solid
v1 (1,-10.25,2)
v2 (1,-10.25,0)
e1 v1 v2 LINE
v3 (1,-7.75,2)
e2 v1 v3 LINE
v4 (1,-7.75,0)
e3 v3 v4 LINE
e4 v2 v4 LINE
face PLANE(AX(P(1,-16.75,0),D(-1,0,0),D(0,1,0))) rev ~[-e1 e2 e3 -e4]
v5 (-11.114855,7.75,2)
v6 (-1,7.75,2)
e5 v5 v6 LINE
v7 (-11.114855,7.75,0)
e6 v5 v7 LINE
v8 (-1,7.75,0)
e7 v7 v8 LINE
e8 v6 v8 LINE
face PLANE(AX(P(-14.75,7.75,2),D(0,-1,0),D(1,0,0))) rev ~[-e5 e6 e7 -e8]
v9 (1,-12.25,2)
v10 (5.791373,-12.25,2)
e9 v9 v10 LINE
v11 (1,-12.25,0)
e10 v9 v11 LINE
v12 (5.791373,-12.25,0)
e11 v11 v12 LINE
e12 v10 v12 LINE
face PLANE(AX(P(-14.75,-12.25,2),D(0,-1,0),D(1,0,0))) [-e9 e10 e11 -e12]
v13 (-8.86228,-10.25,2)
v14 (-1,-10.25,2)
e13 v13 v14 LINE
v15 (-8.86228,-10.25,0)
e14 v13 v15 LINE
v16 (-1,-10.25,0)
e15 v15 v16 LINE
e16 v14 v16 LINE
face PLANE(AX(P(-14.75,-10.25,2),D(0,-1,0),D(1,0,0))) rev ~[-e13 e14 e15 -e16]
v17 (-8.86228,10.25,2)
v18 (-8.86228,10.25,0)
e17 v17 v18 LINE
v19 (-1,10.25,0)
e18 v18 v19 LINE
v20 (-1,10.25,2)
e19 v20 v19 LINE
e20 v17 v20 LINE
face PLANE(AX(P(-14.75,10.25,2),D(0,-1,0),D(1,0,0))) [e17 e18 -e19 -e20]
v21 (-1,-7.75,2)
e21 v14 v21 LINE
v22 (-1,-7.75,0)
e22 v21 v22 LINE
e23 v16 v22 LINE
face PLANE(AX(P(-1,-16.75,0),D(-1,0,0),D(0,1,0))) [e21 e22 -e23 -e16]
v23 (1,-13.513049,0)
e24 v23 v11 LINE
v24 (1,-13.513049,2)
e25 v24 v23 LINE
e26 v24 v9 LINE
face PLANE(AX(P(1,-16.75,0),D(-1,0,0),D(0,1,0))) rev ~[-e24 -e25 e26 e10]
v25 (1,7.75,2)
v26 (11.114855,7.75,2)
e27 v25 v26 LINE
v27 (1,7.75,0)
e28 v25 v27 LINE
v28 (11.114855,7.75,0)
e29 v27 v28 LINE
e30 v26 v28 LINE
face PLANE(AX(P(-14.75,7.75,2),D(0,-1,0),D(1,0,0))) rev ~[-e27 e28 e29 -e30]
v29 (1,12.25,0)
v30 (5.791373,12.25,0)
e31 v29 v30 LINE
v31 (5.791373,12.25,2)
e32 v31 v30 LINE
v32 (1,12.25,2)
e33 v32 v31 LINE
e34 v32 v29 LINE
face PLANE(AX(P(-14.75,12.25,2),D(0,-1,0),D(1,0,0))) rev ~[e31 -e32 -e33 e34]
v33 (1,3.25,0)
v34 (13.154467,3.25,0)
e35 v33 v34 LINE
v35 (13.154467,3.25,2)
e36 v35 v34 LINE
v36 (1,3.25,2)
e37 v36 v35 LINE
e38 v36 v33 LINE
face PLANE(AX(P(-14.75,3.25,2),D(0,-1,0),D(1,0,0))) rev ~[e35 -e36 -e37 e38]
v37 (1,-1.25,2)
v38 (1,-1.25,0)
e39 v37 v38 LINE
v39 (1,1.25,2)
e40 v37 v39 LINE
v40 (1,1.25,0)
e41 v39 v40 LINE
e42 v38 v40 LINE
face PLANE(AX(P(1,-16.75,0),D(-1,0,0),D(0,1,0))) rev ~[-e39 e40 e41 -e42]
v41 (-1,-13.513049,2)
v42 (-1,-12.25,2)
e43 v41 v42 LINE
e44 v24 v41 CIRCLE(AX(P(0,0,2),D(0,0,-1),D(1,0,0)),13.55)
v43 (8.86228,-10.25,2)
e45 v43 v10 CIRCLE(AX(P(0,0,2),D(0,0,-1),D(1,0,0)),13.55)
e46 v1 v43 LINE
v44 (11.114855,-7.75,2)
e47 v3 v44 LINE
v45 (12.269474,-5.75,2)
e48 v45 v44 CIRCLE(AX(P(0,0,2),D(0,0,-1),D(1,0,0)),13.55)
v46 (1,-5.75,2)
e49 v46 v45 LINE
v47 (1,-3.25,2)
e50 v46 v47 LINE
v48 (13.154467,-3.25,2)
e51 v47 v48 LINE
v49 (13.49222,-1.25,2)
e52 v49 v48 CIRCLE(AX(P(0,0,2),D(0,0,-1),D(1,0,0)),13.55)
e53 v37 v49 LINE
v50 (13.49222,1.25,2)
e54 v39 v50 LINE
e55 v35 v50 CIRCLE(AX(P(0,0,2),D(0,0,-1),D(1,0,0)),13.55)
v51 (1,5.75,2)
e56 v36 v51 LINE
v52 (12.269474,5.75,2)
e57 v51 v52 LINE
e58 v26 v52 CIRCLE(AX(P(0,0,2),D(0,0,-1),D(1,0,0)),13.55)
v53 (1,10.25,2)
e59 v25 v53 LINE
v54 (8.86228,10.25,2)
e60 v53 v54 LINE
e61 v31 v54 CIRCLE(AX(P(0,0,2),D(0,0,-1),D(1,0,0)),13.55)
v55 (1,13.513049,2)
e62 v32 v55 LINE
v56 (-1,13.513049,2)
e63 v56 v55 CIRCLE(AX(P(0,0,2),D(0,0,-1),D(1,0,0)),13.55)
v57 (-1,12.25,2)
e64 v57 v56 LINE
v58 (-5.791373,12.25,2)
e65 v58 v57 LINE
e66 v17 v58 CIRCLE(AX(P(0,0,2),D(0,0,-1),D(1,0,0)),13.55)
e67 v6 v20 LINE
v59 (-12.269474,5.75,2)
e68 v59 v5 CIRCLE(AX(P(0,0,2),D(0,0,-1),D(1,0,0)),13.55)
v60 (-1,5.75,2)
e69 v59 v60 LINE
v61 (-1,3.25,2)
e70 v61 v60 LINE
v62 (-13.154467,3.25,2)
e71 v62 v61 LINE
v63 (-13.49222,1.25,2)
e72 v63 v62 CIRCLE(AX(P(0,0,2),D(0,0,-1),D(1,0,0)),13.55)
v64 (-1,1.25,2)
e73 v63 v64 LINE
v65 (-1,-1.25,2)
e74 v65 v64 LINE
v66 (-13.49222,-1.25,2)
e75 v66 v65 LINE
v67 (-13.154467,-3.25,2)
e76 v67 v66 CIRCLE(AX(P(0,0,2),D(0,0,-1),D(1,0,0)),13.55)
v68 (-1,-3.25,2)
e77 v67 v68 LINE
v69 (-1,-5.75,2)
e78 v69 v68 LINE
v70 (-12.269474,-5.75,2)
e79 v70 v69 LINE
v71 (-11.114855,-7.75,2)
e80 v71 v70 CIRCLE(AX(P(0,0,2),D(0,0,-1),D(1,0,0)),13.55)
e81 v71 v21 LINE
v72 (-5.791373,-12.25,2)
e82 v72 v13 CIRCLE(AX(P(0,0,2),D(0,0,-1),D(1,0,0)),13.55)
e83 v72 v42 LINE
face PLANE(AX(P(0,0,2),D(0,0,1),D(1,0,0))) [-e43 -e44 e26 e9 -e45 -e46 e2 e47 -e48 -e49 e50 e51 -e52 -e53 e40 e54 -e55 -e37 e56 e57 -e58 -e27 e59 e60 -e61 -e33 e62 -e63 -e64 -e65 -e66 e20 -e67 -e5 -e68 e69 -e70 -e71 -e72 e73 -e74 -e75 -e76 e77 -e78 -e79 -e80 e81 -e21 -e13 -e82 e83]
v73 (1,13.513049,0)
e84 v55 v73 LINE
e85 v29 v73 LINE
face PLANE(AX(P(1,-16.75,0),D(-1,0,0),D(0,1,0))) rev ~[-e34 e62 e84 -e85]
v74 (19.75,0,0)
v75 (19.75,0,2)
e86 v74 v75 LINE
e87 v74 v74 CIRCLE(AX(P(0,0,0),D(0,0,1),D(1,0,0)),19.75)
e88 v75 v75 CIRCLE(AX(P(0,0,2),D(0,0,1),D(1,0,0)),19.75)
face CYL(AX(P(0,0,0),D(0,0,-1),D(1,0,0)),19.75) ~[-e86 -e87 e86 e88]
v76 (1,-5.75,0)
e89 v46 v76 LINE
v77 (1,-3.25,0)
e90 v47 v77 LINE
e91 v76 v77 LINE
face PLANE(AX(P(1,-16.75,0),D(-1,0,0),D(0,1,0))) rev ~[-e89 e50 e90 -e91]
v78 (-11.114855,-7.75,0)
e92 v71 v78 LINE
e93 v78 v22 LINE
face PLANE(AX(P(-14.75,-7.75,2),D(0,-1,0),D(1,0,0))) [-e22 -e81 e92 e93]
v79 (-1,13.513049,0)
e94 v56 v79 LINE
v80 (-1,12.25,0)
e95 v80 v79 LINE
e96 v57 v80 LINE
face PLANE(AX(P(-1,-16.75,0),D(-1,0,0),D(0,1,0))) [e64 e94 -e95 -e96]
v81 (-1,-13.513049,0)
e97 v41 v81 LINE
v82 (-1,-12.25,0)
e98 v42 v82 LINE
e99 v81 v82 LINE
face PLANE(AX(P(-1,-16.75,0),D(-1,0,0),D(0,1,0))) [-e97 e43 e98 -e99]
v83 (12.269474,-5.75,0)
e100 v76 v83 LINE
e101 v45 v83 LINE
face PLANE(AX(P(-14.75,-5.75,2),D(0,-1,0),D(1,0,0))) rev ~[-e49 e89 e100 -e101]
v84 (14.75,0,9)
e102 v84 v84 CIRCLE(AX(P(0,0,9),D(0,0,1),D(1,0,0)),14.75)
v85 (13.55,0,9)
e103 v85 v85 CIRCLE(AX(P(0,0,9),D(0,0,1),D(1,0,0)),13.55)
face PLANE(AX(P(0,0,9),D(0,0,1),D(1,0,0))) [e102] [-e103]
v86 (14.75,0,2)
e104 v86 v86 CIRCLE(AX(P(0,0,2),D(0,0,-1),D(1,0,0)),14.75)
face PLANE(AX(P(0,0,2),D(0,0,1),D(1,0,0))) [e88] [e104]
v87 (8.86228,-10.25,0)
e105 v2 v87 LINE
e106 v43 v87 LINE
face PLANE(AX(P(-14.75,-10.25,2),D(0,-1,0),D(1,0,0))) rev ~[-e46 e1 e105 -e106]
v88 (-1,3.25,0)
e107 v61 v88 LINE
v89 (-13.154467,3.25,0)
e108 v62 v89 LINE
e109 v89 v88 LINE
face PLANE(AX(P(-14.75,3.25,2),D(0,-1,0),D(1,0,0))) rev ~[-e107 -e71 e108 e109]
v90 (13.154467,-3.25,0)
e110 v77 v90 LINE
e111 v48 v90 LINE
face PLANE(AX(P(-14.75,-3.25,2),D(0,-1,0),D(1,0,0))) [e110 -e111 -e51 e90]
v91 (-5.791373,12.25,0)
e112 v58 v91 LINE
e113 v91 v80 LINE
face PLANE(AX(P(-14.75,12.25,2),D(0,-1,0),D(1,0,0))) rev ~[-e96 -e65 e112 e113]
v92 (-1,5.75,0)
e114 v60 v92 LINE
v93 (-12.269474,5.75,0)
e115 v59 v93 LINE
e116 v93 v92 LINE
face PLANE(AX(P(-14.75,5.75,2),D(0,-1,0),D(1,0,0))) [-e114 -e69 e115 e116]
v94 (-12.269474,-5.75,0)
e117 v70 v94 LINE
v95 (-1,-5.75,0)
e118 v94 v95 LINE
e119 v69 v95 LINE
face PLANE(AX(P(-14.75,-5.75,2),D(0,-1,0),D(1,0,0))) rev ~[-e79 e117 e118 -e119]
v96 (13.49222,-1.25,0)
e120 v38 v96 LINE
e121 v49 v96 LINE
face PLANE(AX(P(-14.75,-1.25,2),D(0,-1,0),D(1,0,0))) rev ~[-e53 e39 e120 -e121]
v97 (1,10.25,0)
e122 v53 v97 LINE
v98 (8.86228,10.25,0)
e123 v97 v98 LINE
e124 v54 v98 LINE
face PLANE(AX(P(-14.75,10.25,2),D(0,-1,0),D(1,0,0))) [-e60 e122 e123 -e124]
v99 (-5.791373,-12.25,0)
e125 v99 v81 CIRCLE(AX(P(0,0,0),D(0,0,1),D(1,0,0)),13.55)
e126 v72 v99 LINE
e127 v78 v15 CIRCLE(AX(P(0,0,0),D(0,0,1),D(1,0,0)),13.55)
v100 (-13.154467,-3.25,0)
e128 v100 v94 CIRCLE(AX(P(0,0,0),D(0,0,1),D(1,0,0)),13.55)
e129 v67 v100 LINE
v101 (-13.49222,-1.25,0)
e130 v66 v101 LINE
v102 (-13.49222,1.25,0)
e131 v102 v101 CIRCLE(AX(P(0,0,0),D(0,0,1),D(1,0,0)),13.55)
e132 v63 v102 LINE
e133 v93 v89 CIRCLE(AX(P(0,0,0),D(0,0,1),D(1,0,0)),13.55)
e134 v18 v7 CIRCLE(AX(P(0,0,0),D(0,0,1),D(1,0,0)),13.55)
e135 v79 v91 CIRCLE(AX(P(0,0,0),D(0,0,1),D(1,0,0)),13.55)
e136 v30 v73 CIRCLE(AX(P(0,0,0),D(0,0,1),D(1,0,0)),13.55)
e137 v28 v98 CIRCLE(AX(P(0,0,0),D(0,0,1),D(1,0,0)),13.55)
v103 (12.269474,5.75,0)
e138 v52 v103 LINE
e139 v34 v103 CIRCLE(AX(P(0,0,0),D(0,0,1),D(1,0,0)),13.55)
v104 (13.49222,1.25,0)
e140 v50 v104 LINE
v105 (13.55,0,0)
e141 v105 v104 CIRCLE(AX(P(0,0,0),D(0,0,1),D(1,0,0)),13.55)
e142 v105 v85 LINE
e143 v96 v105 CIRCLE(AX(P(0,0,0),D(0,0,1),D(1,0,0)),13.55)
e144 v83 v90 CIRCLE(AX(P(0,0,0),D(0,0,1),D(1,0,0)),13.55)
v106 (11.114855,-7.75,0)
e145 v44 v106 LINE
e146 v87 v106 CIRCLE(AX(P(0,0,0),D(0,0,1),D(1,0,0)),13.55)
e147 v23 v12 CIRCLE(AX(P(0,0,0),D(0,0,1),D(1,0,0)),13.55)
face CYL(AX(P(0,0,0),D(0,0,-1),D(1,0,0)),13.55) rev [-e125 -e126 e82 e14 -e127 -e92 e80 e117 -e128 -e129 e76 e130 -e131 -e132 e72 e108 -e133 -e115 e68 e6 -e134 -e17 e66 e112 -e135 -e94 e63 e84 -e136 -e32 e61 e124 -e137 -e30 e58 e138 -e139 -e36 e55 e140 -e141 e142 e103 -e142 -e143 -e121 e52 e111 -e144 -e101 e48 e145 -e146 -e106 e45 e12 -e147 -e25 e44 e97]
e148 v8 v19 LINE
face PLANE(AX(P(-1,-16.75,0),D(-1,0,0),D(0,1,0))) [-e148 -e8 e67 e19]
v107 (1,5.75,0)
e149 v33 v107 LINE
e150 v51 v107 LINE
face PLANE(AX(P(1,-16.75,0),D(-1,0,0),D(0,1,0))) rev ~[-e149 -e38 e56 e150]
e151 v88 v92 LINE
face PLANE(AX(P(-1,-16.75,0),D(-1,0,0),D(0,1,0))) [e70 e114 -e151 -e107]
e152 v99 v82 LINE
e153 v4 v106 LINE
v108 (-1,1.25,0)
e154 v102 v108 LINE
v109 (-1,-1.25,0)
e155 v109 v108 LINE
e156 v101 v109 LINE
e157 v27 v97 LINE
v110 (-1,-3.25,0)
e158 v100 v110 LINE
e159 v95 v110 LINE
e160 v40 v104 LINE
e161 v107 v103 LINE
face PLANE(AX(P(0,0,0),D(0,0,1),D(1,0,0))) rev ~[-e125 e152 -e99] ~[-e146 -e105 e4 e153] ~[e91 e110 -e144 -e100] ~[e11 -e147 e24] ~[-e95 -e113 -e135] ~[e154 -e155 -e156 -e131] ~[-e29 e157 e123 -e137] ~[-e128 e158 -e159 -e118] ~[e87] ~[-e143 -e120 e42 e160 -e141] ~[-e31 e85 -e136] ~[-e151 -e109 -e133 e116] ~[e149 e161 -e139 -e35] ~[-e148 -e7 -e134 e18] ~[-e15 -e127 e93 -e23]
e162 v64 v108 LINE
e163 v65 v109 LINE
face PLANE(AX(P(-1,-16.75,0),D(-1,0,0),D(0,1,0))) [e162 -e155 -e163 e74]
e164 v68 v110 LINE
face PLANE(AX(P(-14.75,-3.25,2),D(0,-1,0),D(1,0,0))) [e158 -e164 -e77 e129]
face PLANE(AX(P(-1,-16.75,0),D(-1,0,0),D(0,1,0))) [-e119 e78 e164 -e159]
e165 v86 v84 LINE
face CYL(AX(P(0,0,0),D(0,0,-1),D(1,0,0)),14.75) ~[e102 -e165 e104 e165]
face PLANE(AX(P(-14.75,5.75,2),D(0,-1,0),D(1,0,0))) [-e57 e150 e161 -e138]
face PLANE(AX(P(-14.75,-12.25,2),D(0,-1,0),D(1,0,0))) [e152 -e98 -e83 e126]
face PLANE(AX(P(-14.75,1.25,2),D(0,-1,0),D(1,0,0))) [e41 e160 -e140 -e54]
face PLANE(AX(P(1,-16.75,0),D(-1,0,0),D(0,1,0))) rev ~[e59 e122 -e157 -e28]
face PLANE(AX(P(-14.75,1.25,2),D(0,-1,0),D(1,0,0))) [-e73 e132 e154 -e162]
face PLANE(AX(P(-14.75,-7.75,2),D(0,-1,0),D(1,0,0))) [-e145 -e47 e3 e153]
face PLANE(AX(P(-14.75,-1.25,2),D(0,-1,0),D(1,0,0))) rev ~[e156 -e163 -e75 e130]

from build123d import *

# Parameters (mm, degrees)
F0_R      = 19.75
F1_DEPTH  = 2
F3_W      = 29.5
F3_H      = 2
F4_DEPTH  = 2
F5_R      = 14.75
F6_DEPTH  = 2
F9_R      = 14.75
F9_R_2    = 13.55
F10_DEPTH = 9
F11_W     = 2
F11_H     = 33.5
F12_DEPTH = 2


with BuildPart() as f1:
    # F0 (on Top) → F1 (new body)
    with BuildSketch(Plane.XY):
        Circle(F0_R)
    extrude(amount=F1_DEPTH)


with BuildPart() as f4:
    # F3 (on face) → F4 (new body, through all)
    with BuildSketch(Plane.XY.offset(2)):
        with Locations((0, -15.75)):
            Rectangle(F3_W, F3_H)
    extrude(amount=-F4_DEPTH)


with BuildPart() as f4b:
    # F3 (on face) → F4, piece 2 (new body, through all)
    with BuildSketch(Plane.XY.offset(2)):
        with Locations((0, -11.25)):
            Rectangle(F3_W, F3_H)
    extrude(amount=-F4_DEPTH)


with BuildPart() as f4c:
    # F3 (on face) → F4, piece 3 (new body, through all)
    with BuildSketch(Plane.XY.offset(2)):
        with Locations((0, -6.75)):
            Rectangle(F3_W, F3_H)
    extrude(amount=-F4_DEPTH)


with BuildPart() as f4d:
    # F3 (on face) → F4, piece 4 (new body, through all)
    with BuildSketch(Plane.XY.offset(2)):
        with Locations((0, -2.25)):
            Rectangle(F3_W, F3_H)
    extrude(amount=-F4_DEPTH)


with BuildPart() as f4e:
    # F3 (on face) → F4, piece 5 (new body, through all)
    with BuildSketch(Plane.XY.offset(2)):
        with Locations((0, 2.25)):
            Rectangle(F3_W, F3_H)
    extrude(amount=-F4_DEPTH)


with BuildPart() as f4f:
    # F3 (on face) → F4, piece 6 (new body, through all)
    with BuildSketch(Plane.XY.offset(2)):
        with Locations((0, 6.75)):
            Rectangle(F3_W, F3_H)
    extrude(amount=-F4_DEPTH)


with BuildPart() as f4g:
    # F3 (on face) → F4, piece 7 (new body, through all)
    with BuildSketch(Plane.XY.offset(2)):
        with Locations((0, 11.25)):
            Rectangle(F3_W, F3_H)
    extrude(amount=-F4_DEPTH)


with BuildPart() as f4h:
    # F3 (on face) → F4, piece 8 (new body, through all)
    with BuildSketch(Plane.XY.offset(2)):
        with Locations((0, 15.75)):
            Rectangle(F3_W, F3_H)
    extrude(amount=-F4_DEPTH)


with BuildPart() as f6:
    # F5 (on Top) → F6 (new body, through all)
    with BuildSketch(Plane.XY):
        Circle(F5_R)
    extrude(amount=F6_DEPTH)

    # F7: cut F4h, F4g, F4f, F4e, F4d, F4c, F4b, F4
    add(f4h.part, mode=Mode.SUBTRACT)
    add(f4g.part, mode=Mode.SUBTRACT)
    add(f4f.part, mode=Mode.SUBTRACT)
    add(f4e.part, mode=Mode.SUBTRACT)
    add(f4d.part, mode=Mode.SUBTRACT)
    add(f4c.part, mode=Mode.SUBTRACT)
    add(f4b.part, mode=Mode.SUBTRACT)
    add(f4.part, mode=Mode.SUBTRACT)


with BuildPart() as f1_1:
    add(f1.part)

    # F8: cut F6
    add(f6.part, mode=Mode.SUBTRACT)

    # F9 (on face) → F10 (join, through all)
    with BuildSketch(Plane.XY):
        Circle(F9_R)
        Circle(F9_R_2, mode=Mode.SUBTRACT)
    extrude(amount=F10_DEPTH)

    # F11 (on face) → F12 (join, through all)
    with BuildSketch(Plane.XY):
        Rectangle(F11_W, F11_H)
    extrude(amount=F12_DEPTH)


solid = f1_1.part
